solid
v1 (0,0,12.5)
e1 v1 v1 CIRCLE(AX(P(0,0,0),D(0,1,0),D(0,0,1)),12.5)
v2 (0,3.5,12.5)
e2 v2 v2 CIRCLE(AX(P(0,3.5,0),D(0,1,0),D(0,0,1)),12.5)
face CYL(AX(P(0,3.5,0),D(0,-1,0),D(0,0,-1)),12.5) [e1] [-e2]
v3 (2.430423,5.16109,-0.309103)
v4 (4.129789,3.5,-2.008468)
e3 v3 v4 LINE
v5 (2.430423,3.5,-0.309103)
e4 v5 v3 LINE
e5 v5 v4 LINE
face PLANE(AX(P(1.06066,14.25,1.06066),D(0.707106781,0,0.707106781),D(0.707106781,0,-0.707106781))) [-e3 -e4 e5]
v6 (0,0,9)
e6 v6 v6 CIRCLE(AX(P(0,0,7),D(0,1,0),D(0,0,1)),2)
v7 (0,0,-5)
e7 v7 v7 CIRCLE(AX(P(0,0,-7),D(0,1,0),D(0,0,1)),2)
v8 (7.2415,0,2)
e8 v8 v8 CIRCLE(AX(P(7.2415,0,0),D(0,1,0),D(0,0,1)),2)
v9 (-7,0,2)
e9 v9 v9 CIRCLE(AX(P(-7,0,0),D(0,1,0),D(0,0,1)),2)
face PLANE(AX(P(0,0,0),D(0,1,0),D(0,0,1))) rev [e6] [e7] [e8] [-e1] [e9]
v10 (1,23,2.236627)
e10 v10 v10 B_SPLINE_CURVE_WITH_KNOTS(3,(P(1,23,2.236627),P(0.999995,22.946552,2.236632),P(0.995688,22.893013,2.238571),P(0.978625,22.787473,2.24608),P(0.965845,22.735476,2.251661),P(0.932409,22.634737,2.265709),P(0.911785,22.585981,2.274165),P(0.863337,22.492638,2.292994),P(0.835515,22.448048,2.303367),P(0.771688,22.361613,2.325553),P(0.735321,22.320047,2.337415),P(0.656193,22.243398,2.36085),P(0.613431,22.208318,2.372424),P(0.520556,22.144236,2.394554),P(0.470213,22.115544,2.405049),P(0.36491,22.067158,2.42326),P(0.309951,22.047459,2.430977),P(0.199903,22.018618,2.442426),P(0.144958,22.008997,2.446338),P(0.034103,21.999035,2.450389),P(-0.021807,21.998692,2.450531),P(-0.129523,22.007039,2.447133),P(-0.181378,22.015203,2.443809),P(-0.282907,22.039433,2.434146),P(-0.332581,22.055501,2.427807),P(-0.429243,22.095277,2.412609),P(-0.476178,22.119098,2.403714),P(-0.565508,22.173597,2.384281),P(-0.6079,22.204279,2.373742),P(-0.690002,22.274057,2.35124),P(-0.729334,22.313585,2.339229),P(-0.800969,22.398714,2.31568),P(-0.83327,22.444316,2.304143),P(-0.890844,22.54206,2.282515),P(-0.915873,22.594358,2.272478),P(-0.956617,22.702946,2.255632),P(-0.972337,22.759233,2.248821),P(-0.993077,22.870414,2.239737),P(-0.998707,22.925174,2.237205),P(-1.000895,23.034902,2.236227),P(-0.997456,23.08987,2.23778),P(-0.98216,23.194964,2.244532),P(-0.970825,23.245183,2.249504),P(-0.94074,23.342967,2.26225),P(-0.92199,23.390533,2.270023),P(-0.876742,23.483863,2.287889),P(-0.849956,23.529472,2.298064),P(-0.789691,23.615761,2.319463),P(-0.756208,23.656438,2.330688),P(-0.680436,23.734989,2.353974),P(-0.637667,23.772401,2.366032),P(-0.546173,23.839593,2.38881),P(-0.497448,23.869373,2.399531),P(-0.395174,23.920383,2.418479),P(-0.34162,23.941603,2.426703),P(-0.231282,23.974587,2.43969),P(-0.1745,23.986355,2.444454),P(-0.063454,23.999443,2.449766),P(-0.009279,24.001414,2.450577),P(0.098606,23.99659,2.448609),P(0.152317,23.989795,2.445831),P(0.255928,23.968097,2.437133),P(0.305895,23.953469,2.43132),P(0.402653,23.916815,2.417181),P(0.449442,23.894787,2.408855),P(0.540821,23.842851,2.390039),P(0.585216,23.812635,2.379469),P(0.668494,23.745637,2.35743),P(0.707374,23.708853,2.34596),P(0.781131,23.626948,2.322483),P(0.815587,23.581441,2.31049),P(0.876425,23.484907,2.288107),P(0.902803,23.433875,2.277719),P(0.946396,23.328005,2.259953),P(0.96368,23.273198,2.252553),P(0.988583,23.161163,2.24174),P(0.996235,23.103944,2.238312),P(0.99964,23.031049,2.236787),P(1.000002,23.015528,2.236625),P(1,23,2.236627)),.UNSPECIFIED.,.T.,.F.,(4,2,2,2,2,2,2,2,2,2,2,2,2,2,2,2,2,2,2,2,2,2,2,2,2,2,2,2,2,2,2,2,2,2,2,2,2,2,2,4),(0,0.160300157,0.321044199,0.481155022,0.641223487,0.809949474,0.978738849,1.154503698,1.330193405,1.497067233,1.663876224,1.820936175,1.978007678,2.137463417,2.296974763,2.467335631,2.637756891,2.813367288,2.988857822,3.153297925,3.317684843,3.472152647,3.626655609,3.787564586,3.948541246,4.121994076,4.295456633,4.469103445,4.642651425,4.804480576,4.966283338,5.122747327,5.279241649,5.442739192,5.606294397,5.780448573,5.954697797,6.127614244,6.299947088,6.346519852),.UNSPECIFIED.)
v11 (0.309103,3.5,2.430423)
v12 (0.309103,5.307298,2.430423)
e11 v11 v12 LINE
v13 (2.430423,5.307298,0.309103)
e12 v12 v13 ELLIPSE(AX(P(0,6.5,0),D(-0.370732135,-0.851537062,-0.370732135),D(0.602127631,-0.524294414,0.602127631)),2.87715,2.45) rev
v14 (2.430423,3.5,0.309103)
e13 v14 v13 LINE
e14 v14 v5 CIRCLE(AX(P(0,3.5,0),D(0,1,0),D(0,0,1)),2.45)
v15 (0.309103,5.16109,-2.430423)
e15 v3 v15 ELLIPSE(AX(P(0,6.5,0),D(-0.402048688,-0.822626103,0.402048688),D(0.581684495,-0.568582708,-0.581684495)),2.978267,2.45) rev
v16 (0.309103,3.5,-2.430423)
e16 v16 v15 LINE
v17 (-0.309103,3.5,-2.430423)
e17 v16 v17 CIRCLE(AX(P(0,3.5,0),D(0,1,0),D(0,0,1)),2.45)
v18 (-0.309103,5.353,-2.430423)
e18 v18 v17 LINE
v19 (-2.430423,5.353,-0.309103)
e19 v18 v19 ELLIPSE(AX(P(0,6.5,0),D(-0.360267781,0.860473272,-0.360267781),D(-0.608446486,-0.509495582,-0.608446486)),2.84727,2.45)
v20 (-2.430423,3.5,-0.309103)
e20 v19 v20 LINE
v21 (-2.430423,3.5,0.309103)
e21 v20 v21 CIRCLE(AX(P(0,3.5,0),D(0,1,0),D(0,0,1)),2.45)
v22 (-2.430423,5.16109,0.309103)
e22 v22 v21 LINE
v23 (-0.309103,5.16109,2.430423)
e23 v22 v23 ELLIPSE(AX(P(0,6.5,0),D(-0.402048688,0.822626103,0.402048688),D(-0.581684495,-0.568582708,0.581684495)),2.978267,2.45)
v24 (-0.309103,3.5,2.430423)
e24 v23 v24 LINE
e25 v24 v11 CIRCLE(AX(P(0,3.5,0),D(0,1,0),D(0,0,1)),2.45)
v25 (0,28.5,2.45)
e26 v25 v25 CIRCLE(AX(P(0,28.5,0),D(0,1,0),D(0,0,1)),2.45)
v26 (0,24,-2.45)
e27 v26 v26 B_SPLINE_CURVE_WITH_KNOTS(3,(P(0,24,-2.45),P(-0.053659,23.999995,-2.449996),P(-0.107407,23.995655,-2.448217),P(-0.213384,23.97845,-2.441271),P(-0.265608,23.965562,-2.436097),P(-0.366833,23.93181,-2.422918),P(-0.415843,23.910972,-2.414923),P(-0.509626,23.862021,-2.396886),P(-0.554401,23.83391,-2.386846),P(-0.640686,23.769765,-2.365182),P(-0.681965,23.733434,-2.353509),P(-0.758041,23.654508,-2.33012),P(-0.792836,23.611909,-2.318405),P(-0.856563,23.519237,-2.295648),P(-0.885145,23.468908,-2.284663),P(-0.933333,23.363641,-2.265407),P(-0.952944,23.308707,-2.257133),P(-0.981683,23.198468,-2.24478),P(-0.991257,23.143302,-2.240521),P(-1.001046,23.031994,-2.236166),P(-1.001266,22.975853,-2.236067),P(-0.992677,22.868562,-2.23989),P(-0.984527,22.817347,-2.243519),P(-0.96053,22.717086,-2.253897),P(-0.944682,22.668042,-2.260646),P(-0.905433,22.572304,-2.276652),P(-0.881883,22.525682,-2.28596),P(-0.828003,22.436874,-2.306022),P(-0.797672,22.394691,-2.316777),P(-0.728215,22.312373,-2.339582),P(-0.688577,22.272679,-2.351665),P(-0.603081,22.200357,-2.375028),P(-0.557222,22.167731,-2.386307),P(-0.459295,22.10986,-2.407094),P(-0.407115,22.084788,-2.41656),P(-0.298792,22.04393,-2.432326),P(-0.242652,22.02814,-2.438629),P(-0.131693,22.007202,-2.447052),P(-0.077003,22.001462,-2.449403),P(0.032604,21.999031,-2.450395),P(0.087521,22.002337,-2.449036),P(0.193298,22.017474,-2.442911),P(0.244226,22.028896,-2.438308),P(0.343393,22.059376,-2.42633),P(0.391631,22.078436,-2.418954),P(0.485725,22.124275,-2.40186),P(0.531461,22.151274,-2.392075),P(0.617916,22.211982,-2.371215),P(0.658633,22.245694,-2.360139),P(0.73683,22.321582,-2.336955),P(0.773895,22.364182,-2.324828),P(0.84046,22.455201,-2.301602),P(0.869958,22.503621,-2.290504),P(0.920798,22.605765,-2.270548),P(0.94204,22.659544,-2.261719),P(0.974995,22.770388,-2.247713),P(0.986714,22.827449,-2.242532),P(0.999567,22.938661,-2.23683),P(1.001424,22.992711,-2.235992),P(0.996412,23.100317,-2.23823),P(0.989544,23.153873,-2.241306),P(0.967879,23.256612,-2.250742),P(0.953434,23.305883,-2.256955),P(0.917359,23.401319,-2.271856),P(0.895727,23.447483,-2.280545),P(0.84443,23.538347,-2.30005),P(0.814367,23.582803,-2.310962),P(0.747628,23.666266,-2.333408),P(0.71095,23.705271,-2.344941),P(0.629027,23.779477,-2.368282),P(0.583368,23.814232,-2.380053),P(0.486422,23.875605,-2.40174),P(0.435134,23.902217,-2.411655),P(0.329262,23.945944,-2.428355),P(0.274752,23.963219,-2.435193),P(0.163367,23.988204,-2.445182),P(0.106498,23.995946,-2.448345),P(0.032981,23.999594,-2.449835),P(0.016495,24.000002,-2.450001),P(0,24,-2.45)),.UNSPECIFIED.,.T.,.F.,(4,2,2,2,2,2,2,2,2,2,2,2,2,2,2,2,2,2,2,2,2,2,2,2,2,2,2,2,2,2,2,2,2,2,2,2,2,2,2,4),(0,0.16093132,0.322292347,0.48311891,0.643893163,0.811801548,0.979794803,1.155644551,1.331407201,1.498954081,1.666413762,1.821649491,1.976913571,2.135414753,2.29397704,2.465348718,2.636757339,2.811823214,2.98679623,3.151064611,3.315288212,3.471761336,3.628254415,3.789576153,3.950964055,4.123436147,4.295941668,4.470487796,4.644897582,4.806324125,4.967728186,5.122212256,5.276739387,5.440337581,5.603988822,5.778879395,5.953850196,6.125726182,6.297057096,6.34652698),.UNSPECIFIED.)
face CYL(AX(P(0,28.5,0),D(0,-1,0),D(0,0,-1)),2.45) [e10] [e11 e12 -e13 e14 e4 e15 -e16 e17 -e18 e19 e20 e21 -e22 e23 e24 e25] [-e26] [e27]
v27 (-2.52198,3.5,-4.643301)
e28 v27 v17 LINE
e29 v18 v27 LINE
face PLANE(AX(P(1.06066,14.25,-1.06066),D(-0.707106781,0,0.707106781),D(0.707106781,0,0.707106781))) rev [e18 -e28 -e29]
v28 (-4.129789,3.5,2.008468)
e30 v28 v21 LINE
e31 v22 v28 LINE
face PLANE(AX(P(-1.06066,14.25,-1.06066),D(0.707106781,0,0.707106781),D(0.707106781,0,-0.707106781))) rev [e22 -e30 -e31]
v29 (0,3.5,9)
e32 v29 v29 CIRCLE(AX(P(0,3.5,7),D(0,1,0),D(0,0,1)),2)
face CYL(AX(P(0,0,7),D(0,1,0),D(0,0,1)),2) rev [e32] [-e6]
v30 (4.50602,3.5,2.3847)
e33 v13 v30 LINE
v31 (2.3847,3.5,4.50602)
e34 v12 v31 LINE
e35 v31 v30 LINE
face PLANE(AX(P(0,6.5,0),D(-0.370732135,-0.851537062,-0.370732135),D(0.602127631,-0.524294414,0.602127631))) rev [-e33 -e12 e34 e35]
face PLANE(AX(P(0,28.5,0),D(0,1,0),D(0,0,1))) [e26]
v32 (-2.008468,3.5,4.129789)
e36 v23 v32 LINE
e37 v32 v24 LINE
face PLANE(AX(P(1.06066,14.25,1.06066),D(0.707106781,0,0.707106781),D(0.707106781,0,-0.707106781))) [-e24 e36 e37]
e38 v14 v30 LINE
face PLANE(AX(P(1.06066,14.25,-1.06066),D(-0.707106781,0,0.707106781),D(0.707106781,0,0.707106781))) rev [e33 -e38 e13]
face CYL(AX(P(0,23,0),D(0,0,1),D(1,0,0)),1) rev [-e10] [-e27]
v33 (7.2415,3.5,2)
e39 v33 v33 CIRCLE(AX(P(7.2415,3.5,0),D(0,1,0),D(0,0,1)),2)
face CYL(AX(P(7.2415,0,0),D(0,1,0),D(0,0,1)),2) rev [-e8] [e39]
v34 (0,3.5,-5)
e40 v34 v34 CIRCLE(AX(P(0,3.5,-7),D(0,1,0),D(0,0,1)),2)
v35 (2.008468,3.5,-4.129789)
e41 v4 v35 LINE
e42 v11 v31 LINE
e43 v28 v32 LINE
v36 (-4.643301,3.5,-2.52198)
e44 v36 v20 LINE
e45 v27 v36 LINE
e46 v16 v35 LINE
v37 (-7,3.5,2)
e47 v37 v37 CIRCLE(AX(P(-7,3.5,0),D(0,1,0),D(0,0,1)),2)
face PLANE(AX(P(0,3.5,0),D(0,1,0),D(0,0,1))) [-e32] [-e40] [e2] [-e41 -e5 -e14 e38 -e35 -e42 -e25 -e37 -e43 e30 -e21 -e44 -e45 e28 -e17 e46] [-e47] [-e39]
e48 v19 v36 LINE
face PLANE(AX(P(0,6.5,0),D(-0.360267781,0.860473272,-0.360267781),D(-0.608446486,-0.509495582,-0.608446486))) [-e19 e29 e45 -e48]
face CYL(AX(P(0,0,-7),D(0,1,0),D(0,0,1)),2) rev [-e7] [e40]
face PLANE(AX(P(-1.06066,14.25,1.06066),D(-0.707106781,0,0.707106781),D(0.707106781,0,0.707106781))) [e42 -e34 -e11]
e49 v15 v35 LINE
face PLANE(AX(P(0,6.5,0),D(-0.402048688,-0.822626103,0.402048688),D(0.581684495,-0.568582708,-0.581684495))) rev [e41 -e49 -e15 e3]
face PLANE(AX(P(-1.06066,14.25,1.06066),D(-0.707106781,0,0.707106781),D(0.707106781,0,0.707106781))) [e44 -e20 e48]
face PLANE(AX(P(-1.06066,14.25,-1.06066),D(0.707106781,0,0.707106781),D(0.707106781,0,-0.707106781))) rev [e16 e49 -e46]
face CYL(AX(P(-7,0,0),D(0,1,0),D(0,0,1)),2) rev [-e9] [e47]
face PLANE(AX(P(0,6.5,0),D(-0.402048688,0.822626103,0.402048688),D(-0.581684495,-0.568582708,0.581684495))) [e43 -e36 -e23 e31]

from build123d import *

# Parameters (mm, degrees)
SKETCH_1_R               = 12.5
EXTRUDE_1_DEPTH          = 3.5
SKETCH_2_R               = 2.45
EXTRUDE_2_DEPTH          = 25
SKETCH_4_R               = 2
CUT_EXTRUDE_1_DEPTH      = 31.618621785
SKETCH_4_5_R             = 2
CUT_EXTRUDE_2_DEPTH      = 31.618621785
RIB_1_REACH              = 35.537
SKETCH_8_WALL_W          = 74.969434882
SKETCH_8_WALL_H          = 3
RIB_6_REACH              = 35.537
SKETCH_9_WALL_W          = 75.07458535
SKETCH_9_WALL_H          = 3
RIB_7_REACH              = 35.537
SKETCH_11_WALL_W         = 75.144527038
SKETCH_11_WALL_H         = 3
CUT_EXTRUDE_4_DEPTH      = 30.008619409
CUT_EXTRUDE_4_DEPTH_BACK = 30.008619409
SKETCH_3D_7_R            = 1


with BuildPart() as part:
    # 草图1 → 凸台-拉伸1 (new body)
    with BuildSketch(Plane(origin=(0, 0, 0), x_dir=(1, 0, 0), z_dir=(0, 1, 0))):
        Circle(SKETCH_1_R)
    extrude(amount=EXTRUDE_1_DEPTH)

    # 草图2 → 凸台-拉伸2 (add)
    with BuildSketch(Plane(origin=(0, 3.5, 0), x_dir=(1, 0, 0), z_dir=(0, 1, 0))):
        Circle(SKETCH_2_R)
    extrude(amount=EXTRUDE_2_DEPTH)

    # 草图4 → 切除-拉伸1 (cut, through all)
    with BuildSketch(Plane(origin=(0, 3.5, 0), x_dir=(1, 0, 0), z_dir=(0, 1, 0))):
        with Locations((0, 7)):
            Circle(SKETCH_4_R)
    extrude(amount=-CUT_EXTRUDE_1_DEPTH, mode=Mode.SUBTRACT)

    # 草图4<5> → 切除-拉伸2 (cut, through all)
    with BuildSketch(Plane(origin=(0, 3.5, 0), x_dir=(1, 0, 0), z_dir=(0, 1, 0))):
        with Locations((7.241500052, 0)):
            Circle(SKETCH_4_5_R)
        with Locations((-7, 0)):
            Circle(SKETCH_4_5_R)
        with Locations((0, -7)):
            Circle(SKETCH_4_5_R)
    extrude(amount=-CUT_EXTRUDE_2_DEPTH, mode=Mode.SUBTRACT)

    # 草图8 wall → 筋1 (add, up to next)
    with BuildSketch(Plane(origin=(1.774725891, 4.95468166, 1.774725891), x_dir=(0.602127630795, -0.524294413919, 0.602127630795), z_dir=(0.37073213542, 0.85153706175, 0.37073213542)), mode=Mode.PRIVATE) as rib_1_sk1:
        Rectangle(SKETCH_8_WALL_W, SKETCH_8_WALL_H)
    rib_1_tool1 = extrude(rib_1_sk1.sketch, amount=-RIB_1_REACH, mode=Mode.PRIVATE) - part.part
    add(rib_1_tool1.solids().sort_by_distance((1.774725891, 4.95468166, 1.774725891))[0])

    # 草图9 wall → 筋6 (add, up to next)
    with BuildSketch(Plane(origin=(-1.825339457, 4.971513253, -1.825339457), x_dir=(-0.608446485545, -0.509495582371, -0.608446485545), z_dir=(0.360267781279, -0.860473271836, 0.360267781279)), mode=Mode.PRIVATE) as rib_6_sk1:
        Rectangle(SKETCH_9_WALL_W, SKETCH_9_WALL_H)
    rib_6_tool1 = extrude(rib_6_sk1.sketch, amount=RIB_6_REACH, mode=Mode.PRIVATE) - part.part
    add(rib_6_tool1.solids().sort_by_distance((-1.825339457, 4.971513253, -1.825339457))[0])

    # 草图11 wall → 筋7 (add, up to next)
    with BuildSketch(Plane(origin=(1.765395484, 4.77436806, -1.765395484), x_dir=(0.581684495472, -0.568582707664, -0.581684495472), z_dir=(0.402048688254, 0.822626102519, -0.402048688254)), mode=Mode.PRIVATE) as rib_7_sk1:
        Rectangle(SKETCH_11_WALL_W, SKETCH_11_WALL_H)
    rib_7_tool1 = extrude(rib_7_sk1.sketch, amount=-RIB_7_REACH, mode=Mode.PRIVATE) - part.part
    rib_7 = rib_7_tool1.solids().sort_by_distance((1.765395484, 4.77436806, -1.765395484))[0]
    add(rib_7)

    # 镜向1: 筋7 across plane
    add(rib_7.mirror(Plane(origin=(0, 0, 0), x_dir=(0.7071067811865465, 0, 0.7071067811865486), z_dir=(-0.7071067811865488, 0, 0.7071067811865464))))

    # Sketch 3D_7 → 切除-拉伸4 (cut, two sides: drawn at the far end of the back side and taken through both)
    with BuildSketch(Plane(origin=(0, 23, 0), x_dir=(0, 1, 0), z_dir=(0, 0, -1)).offset(-CUT_EXTRUDE_4_DEPTH_BACK)):
        Circle(SKETCH_3D_7_R)
    extrude(amount=CUT_EXTRUDE_4_DEPTH + CUT_EXTRUDE_4_DEPTH_BACK, mode=Mode.SUBTRACT)


solid = part.part
